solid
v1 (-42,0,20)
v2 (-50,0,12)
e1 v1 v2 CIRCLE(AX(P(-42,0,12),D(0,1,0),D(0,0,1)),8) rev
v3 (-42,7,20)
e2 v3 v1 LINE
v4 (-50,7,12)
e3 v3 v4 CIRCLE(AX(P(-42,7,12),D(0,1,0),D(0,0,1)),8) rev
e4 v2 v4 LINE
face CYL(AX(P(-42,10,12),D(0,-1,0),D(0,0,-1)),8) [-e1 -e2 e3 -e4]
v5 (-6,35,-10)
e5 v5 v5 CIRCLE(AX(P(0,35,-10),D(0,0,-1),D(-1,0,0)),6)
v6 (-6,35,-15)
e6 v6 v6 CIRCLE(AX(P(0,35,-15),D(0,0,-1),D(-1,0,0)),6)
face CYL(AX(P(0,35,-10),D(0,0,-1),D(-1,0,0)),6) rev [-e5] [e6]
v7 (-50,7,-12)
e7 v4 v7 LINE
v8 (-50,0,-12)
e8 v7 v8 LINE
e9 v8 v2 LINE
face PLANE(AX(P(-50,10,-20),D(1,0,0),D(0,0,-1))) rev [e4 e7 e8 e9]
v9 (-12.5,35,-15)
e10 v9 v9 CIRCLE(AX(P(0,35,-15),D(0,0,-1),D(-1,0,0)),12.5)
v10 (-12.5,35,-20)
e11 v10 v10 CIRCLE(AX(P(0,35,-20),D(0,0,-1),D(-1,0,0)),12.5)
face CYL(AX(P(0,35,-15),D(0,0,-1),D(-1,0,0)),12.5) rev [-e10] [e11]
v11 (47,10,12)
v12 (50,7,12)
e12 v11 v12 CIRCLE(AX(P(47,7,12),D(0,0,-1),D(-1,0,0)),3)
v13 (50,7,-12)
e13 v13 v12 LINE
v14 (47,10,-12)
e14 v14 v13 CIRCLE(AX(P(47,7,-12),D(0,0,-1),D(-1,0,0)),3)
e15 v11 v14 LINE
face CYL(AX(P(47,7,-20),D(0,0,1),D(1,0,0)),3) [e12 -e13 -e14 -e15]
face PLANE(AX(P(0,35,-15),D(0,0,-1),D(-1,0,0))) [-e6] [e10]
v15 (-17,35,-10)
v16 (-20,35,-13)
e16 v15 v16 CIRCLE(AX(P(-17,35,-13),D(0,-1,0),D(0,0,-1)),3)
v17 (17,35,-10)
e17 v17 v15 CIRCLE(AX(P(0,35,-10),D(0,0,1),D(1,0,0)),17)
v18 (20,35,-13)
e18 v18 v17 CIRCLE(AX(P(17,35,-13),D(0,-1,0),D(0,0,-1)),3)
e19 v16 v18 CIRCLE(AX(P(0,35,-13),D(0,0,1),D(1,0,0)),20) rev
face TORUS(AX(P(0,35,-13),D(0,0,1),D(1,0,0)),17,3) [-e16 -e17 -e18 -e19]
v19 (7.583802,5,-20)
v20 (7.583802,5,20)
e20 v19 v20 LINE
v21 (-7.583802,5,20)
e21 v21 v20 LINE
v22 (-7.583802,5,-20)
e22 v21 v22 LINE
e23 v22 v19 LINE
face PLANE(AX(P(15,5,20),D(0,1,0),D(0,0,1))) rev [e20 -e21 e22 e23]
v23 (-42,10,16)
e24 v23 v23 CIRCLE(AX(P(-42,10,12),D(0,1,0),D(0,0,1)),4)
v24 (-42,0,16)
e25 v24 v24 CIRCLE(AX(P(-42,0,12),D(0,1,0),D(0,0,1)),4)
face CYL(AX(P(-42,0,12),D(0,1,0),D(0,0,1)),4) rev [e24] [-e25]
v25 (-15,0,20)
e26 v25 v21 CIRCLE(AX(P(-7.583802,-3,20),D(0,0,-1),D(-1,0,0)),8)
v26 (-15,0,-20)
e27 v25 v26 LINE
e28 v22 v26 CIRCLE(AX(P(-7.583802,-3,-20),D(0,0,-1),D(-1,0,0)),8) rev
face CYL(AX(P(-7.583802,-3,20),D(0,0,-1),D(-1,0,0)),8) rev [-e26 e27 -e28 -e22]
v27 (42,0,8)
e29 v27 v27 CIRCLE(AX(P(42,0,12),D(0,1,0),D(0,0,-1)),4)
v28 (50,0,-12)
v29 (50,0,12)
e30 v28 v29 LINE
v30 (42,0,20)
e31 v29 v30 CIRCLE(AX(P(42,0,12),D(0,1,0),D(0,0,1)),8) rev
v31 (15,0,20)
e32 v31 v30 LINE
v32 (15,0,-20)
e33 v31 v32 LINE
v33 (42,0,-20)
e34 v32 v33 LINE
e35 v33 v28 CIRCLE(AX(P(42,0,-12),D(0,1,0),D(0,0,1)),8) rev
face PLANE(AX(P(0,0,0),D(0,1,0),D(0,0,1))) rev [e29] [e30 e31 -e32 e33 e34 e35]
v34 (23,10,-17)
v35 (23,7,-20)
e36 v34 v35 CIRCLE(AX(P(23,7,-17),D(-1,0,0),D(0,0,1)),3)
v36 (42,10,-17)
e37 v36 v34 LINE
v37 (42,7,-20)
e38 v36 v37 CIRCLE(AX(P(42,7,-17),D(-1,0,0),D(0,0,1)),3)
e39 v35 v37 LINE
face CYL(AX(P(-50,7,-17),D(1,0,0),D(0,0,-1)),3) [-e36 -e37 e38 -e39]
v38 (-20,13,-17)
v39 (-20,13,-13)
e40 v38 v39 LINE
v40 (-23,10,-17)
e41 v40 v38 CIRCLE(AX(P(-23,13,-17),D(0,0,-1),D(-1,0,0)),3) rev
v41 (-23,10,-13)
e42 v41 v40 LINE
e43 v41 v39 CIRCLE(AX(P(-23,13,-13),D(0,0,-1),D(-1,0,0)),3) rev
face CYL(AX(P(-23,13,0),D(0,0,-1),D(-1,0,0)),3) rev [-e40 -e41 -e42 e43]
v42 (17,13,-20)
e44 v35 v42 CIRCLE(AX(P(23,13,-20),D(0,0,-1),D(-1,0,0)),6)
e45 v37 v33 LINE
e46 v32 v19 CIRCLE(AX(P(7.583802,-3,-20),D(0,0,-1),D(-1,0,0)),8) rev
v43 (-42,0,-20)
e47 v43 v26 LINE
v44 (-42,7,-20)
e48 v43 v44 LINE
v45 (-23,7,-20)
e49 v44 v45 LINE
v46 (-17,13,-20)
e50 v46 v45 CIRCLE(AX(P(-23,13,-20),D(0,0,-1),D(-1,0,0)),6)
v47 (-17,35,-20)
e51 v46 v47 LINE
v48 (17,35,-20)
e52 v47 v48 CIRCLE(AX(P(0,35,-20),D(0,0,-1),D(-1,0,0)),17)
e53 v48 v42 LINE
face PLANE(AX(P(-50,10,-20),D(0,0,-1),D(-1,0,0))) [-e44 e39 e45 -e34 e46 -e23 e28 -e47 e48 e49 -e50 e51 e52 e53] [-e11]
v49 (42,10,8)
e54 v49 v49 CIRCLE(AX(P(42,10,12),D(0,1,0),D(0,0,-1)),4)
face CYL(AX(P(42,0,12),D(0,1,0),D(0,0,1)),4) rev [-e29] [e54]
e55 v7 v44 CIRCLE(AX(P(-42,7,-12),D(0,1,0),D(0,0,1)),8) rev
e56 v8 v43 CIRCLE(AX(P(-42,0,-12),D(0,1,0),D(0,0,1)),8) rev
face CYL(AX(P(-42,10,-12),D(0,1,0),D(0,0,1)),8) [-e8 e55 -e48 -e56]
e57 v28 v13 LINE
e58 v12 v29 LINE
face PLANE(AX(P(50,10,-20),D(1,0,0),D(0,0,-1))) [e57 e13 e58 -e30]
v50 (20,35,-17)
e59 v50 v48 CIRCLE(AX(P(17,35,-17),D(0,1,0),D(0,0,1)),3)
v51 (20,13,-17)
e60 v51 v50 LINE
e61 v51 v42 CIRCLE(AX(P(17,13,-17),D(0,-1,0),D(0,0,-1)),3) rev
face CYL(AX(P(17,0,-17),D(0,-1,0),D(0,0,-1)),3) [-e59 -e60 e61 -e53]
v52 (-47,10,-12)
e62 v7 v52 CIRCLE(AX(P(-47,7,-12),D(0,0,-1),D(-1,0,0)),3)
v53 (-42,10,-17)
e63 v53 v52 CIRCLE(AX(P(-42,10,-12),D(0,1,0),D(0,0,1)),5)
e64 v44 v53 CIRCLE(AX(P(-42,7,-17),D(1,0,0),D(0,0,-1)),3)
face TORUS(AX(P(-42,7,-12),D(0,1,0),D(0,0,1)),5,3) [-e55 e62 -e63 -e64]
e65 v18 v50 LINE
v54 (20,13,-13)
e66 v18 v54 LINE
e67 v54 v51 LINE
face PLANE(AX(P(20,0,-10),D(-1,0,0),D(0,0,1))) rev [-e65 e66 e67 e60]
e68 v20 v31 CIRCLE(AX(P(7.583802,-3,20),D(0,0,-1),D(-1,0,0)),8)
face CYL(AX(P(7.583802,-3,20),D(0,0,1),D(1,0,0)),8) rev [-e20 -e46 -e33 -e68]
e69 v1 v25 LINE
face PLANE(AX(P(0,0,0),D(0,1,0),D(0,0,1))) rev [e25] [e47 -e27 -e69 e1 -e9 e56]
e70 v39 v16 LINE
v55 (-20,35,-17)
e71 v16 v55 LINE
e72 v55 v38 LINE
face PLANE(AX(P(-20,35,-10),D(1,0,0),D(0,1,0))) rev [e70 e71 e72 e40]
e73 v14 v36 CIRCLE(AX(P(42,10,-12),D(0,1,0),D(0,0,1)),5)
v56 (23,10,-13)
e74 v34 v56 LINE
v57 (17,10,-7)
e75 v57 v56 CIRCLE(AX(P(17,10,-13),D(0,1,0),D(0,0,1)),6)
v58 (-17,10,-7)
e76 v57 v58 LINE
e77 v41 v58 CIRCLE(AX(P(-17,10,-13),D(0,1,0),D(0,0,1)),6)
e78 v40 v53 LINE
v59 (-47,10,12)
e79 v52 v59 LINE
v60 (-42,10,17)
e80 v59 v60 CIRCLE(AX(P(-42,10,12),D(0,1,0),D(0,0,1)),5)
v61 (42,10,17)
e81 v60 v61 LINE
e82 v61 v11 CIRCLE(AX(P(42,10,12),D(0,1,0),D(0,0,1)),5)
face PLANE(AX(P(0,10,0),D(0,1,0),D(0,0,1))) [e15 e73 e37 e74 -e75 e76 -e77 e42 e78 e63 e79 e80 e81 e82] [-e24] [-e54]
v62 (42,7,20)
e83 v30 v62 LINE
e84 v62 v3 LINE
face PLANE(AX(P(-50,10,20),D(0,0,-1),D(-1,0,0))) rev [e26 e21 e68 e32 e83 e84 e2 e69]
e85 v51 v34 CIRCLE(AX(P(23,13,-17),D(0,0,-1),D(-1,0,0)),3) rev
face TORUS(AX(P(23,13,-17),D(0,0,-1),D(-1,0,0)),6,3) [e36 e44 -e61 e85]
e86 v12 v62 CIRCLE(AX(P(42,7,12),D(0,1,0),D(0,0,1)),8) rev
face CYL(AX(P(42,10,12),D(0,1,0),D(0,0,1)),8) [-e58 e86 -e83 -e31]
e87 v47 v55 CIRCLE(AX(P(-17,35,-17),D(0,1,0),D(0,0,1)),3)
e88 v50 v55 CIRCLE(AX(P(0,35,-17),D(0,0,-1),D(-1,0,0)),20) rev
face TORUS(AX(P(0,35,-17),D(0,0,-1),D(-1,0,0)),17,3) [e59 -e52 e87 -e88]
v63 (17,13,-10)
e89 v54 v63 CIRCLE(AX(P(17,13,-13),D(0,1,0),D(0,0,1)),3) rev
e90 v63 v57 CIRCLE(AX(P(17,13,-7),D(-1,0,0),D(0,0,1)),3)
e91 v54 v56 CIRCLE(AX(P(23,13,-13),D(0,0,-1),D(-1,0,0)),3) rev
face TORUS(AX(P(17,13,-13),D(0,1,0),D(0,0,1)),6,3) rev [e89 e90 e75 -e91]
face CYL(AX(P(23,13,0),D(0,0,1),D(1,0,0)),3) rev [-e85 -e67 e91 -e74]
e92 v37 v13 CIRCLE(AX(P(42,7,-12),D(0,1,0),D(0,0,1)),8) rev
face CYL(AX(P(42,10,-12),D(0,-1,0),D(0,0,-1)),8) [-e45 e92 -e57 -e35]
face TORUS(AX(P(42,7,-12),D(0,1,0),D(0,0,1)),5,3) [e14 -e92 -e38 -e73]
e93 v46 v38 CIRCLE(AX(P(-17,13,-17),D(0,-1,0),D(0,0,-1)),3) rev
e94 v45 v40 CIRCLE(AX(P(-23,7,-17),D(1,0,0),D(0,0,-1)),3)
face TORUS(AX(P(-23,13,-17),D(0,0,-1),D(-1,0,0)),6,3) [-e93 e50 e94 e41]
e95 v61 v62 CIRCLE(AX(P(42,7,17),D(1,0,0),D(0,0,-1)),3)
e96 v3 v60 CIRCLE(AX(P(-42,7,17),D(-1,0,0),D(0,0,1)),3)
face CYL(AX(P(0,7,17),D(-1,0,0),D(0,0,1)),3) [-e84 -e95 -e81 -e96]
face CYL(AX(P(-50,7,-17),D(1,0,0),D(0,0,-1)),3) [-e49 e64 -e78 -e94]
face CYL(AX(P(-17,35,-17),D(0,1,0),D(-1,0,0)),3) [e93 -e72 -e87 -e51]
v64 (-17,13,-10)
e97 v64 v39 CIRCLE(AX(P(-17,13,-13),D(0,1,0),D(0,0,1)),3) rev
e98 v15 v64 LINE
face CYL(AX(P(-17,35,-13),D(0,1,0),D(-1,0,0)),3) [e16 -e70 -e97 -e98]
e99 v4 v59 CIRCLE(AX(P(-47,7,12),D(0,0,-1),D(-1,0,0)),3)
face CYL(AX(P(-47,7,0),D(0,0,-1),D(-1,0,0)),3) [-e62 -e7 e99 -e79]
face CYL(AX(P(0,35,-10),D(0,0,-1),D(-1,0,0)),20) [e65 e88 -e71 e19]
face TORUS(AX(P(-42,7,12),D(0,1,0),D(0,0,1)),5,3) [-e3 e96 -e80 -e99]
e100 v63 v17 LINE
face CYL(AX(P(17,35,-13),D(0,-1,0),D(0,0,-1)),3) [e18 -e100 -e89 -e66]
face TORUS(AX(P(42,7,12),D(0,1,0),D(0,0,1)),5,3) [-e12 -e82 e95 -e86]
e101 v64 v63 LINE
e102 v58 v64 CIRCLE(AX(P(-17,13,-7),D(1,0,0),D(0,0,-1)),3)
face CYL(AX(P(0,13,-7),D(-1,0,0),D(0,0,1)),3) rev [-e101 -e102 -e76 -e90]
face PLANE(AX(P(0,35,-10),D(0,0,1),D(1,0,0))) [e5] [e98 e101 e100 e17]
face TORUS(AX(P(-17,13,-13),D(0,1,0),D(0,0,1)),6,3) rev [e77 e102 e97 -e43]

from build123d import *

# Parameters (mm, degrees)
SKETCH_3_W          = 100
SKETCH_3_H          = 40
EXTRUDE_1_DEPTH     = 10
EXTRUDE_3_DEPTH     = 10
SKETCH_6_R          = 12.5
CUT_EXTRUDE_1_DEPTH = 5
SKETCH_8_R          = 6
CUT_EXTRUDE_2_DEPTH = 5
SKETCH_9_W          = 30
SKETCH_9_H          = 5
CUT_EXTRUDE_4_DEPTH = 85.409715081
FILLET_1_R          = 8
SKETCH_12_R         = 4
CUT_EXTRUDE_6_DEPTH = 71.178344238
FILLET_2_R          = 3


with BuildPart() as part:
    # Эскиз3 → Бобышка-Вытянуть1 (new body)
    with BuildSketch(Plane(origin=(0, 0, 0), x_dir=(1, 0, 0), z_dir=(0, 1, 0))):
        Rectangle(SKETCH_3_W, SKETCH_3_H)
    extrude(amount=EXTRUDE_1_DEPTH)

    # Эскиз4 → Бобышка-Вытянуть3 (add)
    with BuildSketch(Plane(origin=(0, 0, -20), x_dir=(-1, 0, 0), z_dir=(0, 0, -1))):
        with BuildLine():
            Line((-20, 0), (-20, 35))
            ThreePointArc((-20, 35), (0, 55), (20, 35))
            Line((20, 35), (20, 0))
            Line((20, 0), (-20, 0))
        make_face()
    extrude(amount=-EXTRUDE_3_DEPTH)

    # Эскиз6 → Вырез-Вытянуть1 (cut)
    with BuildSketch(Plane(origin=(0, 0, -20), x_dir=(-1, 0, 0), z_dir=(0, 0, -1))):
        with Locations((0, 35)):
            Circle(SKETCH_6_R)
    extrude(amount=-CUT_EXTRUDE_1_DEPTH, mode=Mode.SUBTRACT)

    # Эскиз8 → Вырез-Вытянуть2 (cut)
    with BuildSketch(Plane(origin=(0, 0, -15), x_dir=(-1, 0, 0), z_dir=(0, 0, -1))):
        with Locations((0, 35)):
            Circle(SKETCH_8_R)
    extrude(amount=-CUT_EXTRUDE_2_DEPTH, mode=Mode.SUBTRACT)

    # Эскиз9 → Вырез-Вытянуть4 (cut, through all)
    with BuildSketch(Plane(origin=(0, 0, -20), x_dir=(-1, 0, 0), z_dir=(0, 0, -1))):
        with Locations((0, 2.5)):
            Rectangle(SKETCH_9_W, SKETCH_9_H)
    extrude(amount=-CUT_EXTRUDE_4_DEPTH, mode=Mode.SUBTRACT)

    # Скругление1
    # the kernel refuses this fillet: 8 mm, written as the material it adds along each edge
    with BuildSketch(Plane(origin=(-15, 5, -20), x_dir=(0, -1, 0), z_dir=(0, 0, 1))) as fillet_1_piece_1:
        with BuildLine():
            CenterArc((8, 7.416198487), FILLET_1_R, 180, 67.975687163)
            Line((0, 7.416198487), (0, 0))
            Line((0, 0), (5, 0))
        make_face()
    extrude(amount=40)
    with BuildSketch(Plane(origin=(15, 5, -20), x_dir=(-1, 0, 0), z_dir=(0, 0, 1))) as fillet_1_piece_2:
        with BuildLine():
            CenterArc((7.416198487, 8), FILLET_1_R, 202.024312837, 67.975687163)
            Line((0, 5), (0, 0))
            Line((0, 0), (7.416198487, 0))
        make_face()
    extrude(amount=40)
    # the kernel refuses this fillet: 8 mm, written as the material it takes off along each edge
    with BuildSketch(Plane(origin=(-50, -20, 20), x_dir=(0, 0, -1), z_dir=(0, 1, 0)), Plane(origin=(-50, -20, -20), x_dir=(1, 0, 0), z_dir=(0, 1, 0))) as fillet_1_2_piece_1:
        with BuildLine():
            CenterArc((FILLET_1_R, -FILLET_1_R), FILLET_1_R, 90, 90)
            Line((0, -FILLET_1_R), (0, 0))
            Line((0, 0), (FILLET_1_R, 0))
        make_face()
    extrude(amount=50, mode=Mode.SUBTRACT)
    with BuildSketch(Plane(origin=(50, -20, 20), x_dir=(0, 0, -1), z_dir=(0, 1, 0)), Plane(origin=(50, -20, -20), x_dir=(-1, 0, 0), z_dir=(0, 1, 0))) as fillet_1_2_piece_2:
        with BuildLine():
            CenterArc((FILLET_1_R, FILLET_1_R), FILLET_1_R, 180, 90)
            Line((0, FILLET_1_R), (0, 0))
            Line((0, 0), (FILLET_1_R, 0))
        make_face()
    extrude(amount=50, mode=Mode.SUBTRACT)

    # Эскиз12 → Вырез-Вытянуть6 (cut, through all)
    with BuildSketch(Plane(origin=(0, 10, 0), x_dir=(1, 0, 0), z_dir=(0, 1, 0))):
        with Locations(Location((-42, -12, 0), (0, 0, 270))):
            Circle(SKETCH_12_R)
        with Locations(Location((42, -12, 0), (0, 0, 90))):
            Circle(SKETCH_12_R)
    extrude(amount=-CUT_EXTRUDE_6_DEPTH, mode=Mode.SUBTRACT)

    # Скругление2
    fillet_2_edges = [part.edges().sort_by_distance(p)[0] for p in [
        (31, 10, -20),
        (20, 10, -15),
        (-20, 10, -15),
        (20, 22.5, -20),
        (0, 55, -20),
        (-20, 22.5, -20),
        (-20, 22.5, -10),
        (0, 10, -10),
        (20, 22.5, -10),
        (0, 55, -10),
        (0, 10, 20),
        (-50, 10, 0),
        (-31, 10, -20),
        (50, 10, 0),
        (47.656854249, 10, -17.656854249),
        (47.656854249, 10, 17.656854249),
        (-47.656854249, 10, -17.656854249),
        (-47.656854249, 10, 17.656854249),
    ]]
    fillet(fillet_2_edges, radius=FILLET_2_R)


solid = part.part
